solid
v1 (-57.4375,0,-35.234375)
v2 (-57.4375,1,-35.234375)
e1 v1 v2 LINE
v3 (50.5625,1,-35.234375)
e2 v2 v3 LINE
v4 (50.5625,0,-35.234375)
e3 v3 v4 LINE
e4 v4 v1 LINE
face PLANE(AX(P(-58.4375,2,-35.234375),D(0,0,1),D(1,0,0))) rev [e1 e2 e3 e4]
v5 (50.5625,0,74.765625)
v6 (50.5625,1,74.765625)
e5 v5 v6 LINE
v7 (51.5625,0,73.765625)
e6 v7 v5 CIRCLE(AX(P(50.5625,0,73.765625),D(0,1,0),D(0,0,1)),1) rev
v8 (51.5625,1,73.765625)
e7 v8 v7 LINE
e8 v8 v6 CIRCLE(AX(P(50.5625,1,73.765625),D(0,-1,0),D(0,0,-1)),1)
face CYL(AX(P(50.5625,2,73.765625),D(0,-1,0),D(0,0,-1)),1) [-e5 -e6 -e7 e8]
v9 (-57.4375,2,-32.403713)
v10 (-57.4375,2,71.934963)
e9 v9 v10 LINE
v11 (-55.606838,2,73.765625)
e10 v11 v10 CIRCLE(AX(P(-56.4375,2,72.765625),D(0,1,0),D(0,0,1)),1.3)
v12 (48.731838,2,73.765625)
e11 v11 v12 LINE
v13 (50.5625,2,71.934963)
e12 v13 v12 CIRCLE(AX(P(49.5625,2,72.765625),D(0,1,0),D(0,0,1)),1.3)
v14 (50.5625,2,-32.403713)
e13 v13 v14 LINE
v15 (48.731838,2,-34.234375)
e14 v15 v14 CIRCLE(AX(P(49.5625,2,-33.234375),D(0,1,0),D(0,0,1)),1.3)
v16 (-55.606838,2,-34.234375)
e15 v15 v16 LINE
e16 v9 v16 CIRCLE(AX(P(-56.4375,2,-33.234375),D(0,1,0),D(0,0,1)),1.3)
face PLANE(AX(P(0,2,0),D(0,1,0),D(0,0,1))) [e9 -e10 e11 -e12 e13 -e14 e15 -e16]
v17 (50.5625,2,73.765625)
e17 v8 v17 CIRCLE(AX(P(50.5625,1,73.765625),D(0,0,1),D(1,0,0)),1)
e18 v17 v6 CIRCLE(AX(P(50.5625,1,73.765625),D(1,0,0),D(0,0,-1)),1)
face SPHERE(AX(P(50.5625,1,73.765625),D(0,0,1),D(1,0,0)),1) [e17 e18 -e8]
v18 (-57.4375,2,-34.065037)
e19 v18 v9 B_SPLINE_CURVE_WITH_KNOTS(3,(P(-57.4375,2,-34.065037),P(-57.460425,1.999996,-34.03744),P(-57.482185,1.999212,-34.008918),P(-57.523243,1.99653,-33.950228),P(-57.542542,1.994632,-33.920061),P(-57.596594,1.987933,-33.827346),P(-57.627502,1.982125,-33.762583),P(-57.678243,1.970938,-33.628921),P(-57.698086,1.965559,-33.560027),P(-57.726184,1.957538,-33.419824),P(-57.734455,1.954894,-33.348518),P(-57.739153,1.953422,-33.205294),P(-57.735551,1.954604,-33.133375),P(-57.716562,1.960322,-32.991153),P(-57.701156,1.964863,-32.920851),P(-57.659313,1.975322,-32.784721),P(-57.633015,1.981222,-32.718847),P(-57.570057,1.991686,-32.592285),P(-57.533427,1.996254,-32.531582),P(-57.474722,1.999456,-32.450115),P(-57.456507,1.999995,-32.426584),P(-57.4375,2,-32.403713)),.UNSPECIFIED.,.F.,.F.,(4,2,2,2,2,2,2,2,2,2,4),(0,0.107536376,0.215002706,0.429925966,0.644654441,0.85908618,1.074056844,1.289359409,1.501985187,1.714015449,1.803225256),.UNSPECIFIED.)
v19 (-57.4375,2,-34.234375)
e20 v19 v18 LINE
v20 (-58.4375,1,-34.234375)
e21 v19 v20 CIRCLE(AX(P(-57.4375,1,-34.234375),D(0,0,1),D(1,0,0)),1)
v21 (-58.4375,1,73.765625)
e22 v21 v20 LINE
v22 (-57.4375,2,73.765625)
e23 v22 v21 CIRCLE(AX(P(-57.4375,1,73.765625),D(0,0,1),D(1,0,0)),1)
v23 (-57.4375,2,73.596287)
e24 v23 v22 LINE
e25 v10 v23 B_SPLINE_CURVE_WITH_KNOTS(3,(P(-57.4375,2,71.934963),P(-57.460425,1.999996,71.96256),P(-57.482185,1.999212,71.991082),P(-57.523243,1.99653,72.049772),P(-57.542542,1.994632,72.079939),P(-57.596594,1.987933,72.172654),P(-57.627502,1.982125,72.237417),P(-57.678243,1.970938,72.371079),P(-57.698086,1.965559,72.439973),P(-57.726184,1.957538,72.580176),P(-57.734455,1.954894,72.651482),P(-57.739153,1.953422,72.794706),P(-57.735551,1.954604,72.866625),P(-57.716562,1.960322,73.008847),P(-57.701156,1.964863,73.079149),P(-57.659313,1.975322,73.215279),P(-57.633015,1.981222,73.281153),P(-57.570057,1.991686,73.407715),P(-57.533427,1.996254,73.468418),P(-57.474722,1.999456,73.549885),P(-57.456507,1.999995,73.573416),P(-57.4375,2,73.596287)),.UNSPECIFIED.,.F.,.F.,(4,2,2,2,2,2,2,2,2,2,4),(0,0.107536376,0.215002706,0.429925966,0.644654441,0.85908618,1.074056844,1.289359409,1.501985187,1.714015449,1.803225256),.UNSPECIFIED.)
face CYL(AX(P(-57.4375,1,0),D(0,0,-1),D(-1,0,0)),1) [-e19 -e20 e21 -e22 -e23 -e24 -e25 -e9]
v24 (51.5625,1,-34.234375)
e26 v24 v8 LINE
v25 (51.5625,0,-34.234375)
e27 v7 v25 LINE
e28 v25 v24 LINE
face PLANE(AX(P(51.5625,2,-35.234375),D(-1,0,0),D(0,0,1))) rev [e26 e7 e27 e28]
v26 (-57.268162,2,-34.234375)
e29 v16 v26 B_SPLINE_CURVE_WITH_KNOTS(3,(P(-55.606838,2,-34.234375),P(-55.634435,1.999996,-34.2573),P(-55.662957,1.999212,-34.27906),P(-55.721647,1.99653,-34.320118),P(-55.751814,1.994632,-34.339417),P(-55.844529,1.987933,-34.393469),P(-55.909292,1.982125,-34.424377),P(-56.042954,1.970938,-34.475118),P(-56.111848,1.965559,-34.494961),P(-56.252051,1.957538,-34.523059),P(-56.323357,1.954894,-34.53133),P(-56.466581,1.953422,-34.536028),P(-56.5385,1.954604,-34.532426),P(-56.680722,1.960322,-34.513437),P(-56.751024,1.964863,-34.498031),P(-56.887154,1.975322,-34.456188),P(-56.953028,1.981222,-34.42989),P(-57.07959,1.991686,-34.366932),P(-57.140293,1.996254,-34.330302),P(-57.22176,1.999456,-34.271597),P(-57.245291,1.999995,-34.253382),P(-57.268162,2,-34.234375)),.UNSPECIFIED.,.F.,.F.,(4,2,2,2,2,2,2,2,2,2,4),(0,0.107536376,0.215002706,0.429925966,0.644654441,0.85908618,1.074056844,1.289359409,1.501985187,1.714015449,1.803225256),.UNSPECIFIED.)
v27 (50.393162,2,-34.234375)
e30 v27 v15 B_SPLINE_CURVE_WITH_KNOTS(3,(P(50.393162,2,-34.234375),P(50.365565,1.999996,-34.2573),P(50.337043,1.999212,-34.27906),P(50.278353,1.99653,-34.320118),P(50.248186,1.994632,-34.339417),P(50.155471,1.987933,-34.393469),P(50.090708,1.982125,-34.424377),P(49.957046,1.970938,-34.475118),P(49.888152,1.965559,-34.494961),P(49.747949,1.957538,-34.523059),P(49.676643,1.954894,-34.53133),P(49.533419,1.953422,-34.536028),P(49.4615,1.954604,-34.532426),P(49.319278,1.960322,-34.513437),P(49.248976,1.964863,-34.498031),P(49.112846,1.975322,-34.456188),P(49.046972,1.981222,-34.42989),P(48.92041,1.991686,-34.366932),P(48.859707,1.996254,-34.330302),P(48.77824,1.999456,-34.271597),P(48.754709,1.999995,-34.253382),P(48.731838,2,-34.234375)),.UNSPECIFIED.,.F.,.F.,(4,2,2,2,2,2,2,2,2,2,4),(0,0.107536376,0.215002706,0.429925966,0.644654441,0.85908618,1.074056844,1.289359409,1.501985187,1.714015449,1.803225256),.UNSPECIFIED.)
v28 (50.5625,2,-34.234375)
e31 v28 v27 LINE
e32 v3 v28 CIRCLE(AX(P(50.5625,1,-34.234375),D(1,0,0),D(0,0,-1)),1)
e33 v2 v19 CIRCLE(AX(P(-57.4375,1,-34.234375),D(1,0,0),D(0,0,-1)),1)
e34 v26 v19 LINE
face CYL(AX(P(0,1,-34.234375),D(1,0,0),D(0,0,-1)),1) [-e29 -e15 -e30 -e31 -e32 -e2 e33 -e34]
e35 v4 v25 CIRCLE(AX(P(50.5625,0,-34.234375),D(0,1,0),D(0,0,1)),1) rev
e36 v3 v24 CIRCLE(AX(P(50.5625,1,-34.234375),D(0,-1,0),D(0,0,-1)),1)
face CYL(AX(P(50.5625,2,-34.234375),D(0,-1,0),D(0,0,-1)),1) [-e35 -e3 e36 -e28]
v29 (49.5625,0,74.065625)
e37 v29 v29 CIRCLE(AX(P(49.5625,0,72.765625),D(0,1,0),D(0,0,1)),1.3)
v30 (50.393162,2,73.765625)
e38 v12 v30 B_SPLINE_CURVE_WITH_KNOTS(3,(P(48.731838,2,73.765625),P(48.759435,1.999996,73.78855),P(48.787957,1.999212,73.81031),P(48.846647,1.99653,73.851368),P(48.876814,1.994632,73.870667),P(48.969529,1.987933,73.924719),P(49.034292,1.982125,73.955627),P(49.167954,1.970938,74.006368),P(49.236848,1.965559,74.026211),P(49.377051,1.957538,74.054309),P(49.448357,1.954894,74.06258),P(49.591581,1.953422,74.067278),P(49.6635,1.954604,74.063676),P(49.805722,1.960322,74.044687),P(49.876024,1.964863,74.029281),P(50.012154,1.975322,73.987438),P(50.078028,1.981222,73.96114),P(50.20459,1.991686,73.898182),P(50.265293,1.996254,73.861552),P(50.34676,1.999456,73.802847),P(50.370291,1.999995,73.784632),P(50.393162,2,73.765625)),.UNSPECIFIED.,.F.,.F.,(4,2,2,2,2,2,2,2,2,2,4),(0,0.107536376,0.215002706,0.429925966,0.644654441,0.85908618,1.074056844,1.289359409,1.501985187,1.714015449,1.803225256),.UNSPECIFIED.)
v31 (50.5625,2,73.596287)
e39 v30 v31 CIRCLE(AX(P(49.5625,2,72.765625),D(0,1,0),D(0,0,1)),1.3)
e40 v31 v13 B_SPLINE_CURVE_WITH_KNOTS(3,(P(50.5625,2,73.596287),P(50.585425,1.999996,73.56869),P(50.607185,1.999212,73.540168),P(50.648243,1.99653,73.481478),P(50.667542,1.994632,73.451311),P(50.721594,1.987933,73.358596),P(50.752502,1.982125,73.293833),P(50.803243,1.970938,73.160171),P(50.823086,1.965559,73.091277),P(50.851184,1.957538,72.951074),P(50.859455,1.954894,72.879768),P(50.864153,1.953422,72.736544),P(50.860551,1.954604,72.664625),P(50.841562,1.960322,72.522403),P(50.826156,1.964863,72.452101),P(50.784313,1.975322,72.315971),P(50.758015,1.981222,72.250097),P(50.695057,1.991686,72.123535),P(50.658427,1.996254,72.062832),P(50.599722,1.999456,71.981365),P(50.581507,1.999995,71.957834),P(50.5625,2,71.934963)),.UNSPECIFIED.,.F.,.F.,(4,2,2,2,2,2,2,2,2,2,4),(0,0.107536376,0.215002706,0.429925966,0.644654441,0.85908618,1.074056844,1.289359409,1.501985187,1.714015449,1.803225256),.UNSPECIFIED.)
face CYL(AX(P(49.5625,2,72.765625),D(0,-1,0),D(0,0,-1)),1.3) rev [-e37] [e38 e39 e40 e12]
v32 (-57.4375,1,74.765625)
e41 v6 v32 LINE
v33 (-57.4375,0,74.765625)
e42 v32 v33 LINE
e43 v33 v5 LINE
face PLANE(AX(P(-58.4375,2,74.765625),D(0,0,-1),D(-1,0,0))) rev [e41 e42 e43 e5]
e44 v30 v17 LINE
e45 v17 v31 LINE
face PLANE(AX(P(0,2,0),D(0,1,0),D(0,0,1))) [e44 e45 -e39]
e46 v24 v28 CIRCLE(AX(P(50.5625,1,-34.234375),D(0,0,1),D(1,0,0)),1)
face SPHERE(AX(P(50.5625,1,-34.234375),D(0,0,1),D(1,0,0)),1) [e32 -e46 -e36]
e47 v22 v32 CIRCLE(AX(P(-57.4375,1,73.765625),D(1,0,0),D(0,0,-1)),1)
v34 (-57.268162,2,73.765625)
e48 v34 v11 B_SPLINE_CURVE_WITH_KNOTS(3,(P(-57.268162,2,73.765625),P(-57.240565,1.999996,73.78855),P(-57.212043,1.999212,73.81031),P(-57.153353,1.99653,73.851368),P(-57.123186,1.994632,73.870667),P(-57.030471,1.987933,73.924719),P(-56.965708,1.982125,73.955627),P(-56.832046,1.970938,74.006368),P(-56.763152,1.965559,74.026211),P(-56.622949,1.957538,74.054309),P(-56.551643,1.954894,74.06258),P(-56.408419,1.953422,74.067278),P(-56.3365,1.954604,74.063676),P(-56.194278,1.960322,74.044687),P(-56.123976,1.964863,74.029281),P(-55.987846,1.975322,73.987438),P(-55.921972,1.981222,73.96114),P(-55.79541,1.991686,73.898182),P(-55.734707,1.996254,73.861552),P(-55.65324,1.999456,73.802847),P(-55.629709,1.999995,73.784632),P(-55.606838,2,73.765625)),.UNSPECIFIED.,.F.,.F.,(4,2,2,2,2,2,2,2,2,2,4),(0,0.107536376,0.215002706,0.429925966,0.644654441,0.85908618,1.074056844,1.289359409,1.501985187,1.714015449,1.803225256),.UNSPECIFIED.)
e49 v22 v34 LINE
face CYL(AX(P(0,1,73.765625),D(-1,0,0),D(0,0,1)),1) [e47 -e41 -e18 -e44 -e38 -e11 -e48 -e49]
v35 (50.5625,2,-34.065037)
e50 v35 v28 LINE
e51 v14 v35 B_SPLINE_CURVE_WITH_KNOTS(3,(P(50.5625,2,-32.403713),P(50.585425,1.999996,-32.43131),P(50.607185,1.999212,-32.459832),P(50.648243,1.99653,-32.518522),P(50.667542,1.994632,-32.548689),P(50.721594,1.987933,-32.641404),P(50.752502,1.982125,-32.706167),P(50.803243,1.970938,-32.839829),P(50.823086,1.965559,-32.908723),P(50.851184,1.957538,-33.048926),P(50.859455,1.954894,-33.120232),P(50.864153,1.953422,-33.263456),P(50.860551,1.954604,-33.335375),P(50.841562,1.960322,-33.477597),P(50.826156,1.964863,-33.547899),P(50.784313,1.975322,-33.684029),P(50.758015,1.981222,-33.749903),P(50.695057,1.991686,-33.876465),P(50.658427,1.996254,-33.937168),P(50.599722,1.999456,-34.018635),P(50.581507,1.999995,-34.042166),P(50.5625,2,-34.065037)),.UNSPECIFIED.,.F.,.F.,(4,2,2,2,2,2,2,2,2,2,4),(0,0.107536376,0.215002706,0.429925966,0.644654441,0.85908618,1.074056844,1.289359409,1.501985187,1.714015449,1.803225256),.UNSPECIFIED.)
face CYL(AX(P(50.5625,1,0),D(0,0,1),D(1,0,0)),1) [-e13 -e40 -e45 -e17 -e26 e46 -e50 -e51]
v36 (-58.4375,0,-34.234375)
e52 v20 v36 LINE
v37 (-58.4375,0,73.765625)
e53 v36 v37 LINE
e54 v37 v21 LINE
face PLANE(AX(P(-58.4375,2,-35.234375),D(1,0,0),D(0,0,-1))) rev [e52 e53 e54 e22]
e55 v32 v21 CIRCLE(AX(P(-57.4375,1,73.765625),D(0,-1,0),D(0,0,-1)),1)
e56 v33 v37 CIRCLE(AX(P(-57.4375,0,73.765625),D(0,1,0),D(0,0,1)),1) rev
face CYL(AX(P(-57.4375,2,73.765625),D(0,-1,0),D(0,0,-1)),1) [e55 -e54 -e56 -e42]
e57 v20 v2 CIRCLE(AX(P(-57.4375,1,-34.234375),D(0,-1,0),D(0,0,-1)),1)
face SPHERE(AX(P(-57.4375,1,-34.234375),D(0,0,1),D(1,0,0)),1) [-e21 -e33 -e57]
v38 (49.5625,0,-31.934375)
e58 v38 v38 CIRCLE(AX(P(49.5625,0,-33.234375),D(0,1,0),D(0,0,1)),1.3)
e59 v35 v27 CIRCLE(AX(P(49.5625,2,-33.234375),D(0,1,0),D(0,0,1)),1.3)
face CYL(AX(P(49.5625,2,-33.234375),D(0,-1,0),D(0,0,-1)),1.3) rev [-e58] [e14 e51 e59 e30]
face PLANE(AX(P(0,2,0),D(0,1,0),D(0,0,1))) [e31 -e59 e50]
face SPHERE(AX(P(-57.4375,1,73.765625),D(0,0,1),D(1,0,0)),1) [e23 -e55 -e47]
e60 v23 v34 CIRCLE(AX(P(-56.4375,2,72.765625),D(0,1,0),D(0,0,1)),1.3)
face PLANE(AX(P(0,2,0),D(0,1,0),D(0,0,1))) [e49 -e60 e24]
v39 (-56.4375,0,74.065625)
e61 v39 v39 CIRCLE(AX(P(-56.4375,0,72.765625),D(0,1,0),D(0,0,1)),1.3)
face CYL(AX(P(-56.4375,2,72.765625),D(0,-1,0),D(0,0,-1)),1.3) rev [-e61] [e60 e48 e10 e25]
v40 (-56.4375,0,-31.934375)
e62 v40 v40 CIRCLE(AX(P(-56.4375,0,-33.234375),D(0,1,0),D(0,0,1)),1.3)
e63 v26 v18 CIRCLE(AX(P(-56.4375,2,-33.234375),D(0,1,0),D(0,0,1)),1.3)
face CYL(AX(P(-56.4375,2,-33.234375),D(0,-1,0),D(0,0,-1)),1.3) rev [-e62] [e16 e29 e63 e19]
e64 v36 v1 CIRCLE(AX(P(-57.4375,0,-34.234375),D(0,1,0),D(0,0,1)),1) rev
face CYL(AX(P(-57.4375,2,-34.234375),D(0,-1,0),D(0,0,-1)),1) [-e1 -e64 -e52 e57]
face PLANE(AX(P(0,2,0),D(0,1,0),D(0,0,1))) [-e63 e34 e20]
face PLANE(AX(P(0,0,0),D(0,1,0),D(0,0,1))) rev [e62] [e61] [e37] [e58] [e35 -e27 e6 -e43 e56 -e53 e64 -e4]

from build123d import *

# Parameters (mm, degrees)
ESQUISSE1_W        = 110
ESQUISSE1_H        = 110
ESQUISSE1_R        = 1.3
BOSS_EXTRU_1_DEPTH = 2
CONG_2_R           = 1
CONG_3_R           = 1
CONG_5_R           = 1


with BuildPart() as part:
    # Esquisse1 → Boss.-Extru.1 (new body)
    with BuildSketch(Plane(origin=(0, 0, 0), x_dir=(1, 0, 0), z_dir=(0, 1, 0))):
        with Locations((-3.4375, -19.765625)):
            Rectangle(ESQUISSE1_W, ESQUISSE1_H)
        with Locations(Location((-56.4375, 33.234375, 0), (0, 0, 270))):
            Circle(ESQUISSE1_R, mode=Mode.SUBTRACT)
        with Locations(Location((49.5625, 33.234375, 0), (0, 0, 270))):
            Circle(ESQUISSE1_R, mode=Mode.SUBTRACT)
        with Locations(Location((-56.4375, -72.765625, 0), (0, 0, 270))):
            Circle(ESQUISSE1_R, mode=Mode.SUBTRACT)
        with Locations(Location((49.5625, -72.765625, 0), (0, 0, 270))):
            Circle(ESQUISSE1_R, mode=Mode.SUBTRACT)
    extrude(amount=BOSS_EXTRU_1_DEPTH)

    # Congé2
    cong_2_edges = [part.edges().sort_by_distance(p)[0] for p in [
        (-58.4375, 1, 74.765625),
    ]]
    fillet(cong_2_edges, radius=CONG_2_R)

    # Congé3
    cong_3_edges = [part.edges().sort_by_distance(p)[0] for p in [
        (-58.4375, 1, -35.234375),
        (51.5625, 1, -35.234375),
        (51.5625, 1, 74.765625),
    ]]
    fillet(cong_3_edges, radius=CONG_3_R)

    # Congé5
    # the kernel refuses this fillet: 1 mm, written as the material it takes off along each edge
    with BuildSketch(Plane(origin=(50.5625, 2, 74.765625), x_dir=(0, -1, 0), z_dir=(-1, 0, 0))) as cong_5_piece_1:
        with BuildLine():
            CenterArc((CONG_5_R, -CONG_5_R), CONG_5_R, 90, 90)
            Line((0, -CONG_5_R), (0, 0))
            Line((0, 0), (CONG_5_R, 0))
        make_face()
    extrude(amount=108, mode=Mode.SUBTRACT)
    with BuildSketch(Plane(origin=(-57.4375, 2, 73.765625), x_dir=(0, 0, 1), z_dir=(1, 0, 0))) as cong_5_piece_2:
        with BuildLine():
            CenterArc((1 - CONG_5_R, CONG_5_R), CONG_5_R, 270, 90)
            Line((1 - CONG_5_R, 0), (1, 0))
            Line((1, 0), (1, CONG_5_R))
        make_face()
    revolve(axis=Axis((-57.4375, 2, 73.765625), (0, -1, 0)), revolution_arc=90, mode=Mode.SUBTRACT)
    with BuildSketch(Plane(origin=(-58.4375, 2, 73.765625), x_dir=(1, 0, 0), z_dir=(0, 0, -1)), Plane(origin=(-57.4375, 2, -35.234375), x_dir=(0, 0, 1), z_dir=(1, 0, 0)), Plane(origin=(51.5625, 2, -34.234375), x_dir=(-1, 0, 0), z_dir=(0, 0, 1))) as cong_5_piece_3:
        with BuildLine():
            CenterArc((CONG_5_R, CONG_5_R), CONG_5_R, 180, 90)
            Line((0, CONG_5_R), (0, 0))
            Line((0, 0), (CONG_5_R, 0))
        make_face()
    extrude(amount=108, mode=Mode.SUBTRACT)
    with BuildSketch(Plane(origin=(50.5625, 2, 73.765625), x_dir=(0, 0, 1), z_dir=(-1, 0, 0))) as cong_5_piece_4:
        with BuildLine():
            CenterArc((1 - CONG_5_R, -CONG_5_R), CONG_5_R, 0, 90)
            Line((1 - CONG_5_R, 0), (1, 0))
            Line((1, 0), (1, -CONG_5_R))
        make_face()
    revolve(axis=Axis((50.5625, 2, 73.765625), (0, 1, 0)), revolution_arc=90, mode=Mode.SUBTRACT)
    with BuildSketch(Plane(origin=(50.5625, 2, -34.234375), x_dir=(1, 0, 0), z_dir=(0, 0, 1))) as cong_5_piece_5:
        with BuildLine():
            CenterArc((1 - CONG_5_R, -CONG_5_R), CONG_5_R, 0, 90)
            Line((1, -CONG_5_R), (1, 0))
            Line((1, 0), (1 - CONG_5_R, 0))
        make_face()
    revolve(axis=Axis((50.5625, 2, -34.234375), (0, 1, 0)), revolution_arc=90, mode=Mode.SUBTRACT)
    with BuildSketch(Plane(origin=(-57.4375, 2, -34.234375), x_dir=(-1, 0, 0), z_dir=(0, 0, 1))) as cong_5_piece_6:
        with BuildLine():
            CenterArc((1 - CONG_5_R, CONG_5_R), CONG_5_R, 270, 90)
            Line((1, CONG_5_R), (1, 0))
            Line((1, 0), (1 - CONG_5_R, 0))
        make_face()
    revolve(axis=Axis((-57.4375, 2, -34.234375), (0, -1, 0)), revolution_arc=90, mode=Mode.SUBTRACT)


solid = part.part
